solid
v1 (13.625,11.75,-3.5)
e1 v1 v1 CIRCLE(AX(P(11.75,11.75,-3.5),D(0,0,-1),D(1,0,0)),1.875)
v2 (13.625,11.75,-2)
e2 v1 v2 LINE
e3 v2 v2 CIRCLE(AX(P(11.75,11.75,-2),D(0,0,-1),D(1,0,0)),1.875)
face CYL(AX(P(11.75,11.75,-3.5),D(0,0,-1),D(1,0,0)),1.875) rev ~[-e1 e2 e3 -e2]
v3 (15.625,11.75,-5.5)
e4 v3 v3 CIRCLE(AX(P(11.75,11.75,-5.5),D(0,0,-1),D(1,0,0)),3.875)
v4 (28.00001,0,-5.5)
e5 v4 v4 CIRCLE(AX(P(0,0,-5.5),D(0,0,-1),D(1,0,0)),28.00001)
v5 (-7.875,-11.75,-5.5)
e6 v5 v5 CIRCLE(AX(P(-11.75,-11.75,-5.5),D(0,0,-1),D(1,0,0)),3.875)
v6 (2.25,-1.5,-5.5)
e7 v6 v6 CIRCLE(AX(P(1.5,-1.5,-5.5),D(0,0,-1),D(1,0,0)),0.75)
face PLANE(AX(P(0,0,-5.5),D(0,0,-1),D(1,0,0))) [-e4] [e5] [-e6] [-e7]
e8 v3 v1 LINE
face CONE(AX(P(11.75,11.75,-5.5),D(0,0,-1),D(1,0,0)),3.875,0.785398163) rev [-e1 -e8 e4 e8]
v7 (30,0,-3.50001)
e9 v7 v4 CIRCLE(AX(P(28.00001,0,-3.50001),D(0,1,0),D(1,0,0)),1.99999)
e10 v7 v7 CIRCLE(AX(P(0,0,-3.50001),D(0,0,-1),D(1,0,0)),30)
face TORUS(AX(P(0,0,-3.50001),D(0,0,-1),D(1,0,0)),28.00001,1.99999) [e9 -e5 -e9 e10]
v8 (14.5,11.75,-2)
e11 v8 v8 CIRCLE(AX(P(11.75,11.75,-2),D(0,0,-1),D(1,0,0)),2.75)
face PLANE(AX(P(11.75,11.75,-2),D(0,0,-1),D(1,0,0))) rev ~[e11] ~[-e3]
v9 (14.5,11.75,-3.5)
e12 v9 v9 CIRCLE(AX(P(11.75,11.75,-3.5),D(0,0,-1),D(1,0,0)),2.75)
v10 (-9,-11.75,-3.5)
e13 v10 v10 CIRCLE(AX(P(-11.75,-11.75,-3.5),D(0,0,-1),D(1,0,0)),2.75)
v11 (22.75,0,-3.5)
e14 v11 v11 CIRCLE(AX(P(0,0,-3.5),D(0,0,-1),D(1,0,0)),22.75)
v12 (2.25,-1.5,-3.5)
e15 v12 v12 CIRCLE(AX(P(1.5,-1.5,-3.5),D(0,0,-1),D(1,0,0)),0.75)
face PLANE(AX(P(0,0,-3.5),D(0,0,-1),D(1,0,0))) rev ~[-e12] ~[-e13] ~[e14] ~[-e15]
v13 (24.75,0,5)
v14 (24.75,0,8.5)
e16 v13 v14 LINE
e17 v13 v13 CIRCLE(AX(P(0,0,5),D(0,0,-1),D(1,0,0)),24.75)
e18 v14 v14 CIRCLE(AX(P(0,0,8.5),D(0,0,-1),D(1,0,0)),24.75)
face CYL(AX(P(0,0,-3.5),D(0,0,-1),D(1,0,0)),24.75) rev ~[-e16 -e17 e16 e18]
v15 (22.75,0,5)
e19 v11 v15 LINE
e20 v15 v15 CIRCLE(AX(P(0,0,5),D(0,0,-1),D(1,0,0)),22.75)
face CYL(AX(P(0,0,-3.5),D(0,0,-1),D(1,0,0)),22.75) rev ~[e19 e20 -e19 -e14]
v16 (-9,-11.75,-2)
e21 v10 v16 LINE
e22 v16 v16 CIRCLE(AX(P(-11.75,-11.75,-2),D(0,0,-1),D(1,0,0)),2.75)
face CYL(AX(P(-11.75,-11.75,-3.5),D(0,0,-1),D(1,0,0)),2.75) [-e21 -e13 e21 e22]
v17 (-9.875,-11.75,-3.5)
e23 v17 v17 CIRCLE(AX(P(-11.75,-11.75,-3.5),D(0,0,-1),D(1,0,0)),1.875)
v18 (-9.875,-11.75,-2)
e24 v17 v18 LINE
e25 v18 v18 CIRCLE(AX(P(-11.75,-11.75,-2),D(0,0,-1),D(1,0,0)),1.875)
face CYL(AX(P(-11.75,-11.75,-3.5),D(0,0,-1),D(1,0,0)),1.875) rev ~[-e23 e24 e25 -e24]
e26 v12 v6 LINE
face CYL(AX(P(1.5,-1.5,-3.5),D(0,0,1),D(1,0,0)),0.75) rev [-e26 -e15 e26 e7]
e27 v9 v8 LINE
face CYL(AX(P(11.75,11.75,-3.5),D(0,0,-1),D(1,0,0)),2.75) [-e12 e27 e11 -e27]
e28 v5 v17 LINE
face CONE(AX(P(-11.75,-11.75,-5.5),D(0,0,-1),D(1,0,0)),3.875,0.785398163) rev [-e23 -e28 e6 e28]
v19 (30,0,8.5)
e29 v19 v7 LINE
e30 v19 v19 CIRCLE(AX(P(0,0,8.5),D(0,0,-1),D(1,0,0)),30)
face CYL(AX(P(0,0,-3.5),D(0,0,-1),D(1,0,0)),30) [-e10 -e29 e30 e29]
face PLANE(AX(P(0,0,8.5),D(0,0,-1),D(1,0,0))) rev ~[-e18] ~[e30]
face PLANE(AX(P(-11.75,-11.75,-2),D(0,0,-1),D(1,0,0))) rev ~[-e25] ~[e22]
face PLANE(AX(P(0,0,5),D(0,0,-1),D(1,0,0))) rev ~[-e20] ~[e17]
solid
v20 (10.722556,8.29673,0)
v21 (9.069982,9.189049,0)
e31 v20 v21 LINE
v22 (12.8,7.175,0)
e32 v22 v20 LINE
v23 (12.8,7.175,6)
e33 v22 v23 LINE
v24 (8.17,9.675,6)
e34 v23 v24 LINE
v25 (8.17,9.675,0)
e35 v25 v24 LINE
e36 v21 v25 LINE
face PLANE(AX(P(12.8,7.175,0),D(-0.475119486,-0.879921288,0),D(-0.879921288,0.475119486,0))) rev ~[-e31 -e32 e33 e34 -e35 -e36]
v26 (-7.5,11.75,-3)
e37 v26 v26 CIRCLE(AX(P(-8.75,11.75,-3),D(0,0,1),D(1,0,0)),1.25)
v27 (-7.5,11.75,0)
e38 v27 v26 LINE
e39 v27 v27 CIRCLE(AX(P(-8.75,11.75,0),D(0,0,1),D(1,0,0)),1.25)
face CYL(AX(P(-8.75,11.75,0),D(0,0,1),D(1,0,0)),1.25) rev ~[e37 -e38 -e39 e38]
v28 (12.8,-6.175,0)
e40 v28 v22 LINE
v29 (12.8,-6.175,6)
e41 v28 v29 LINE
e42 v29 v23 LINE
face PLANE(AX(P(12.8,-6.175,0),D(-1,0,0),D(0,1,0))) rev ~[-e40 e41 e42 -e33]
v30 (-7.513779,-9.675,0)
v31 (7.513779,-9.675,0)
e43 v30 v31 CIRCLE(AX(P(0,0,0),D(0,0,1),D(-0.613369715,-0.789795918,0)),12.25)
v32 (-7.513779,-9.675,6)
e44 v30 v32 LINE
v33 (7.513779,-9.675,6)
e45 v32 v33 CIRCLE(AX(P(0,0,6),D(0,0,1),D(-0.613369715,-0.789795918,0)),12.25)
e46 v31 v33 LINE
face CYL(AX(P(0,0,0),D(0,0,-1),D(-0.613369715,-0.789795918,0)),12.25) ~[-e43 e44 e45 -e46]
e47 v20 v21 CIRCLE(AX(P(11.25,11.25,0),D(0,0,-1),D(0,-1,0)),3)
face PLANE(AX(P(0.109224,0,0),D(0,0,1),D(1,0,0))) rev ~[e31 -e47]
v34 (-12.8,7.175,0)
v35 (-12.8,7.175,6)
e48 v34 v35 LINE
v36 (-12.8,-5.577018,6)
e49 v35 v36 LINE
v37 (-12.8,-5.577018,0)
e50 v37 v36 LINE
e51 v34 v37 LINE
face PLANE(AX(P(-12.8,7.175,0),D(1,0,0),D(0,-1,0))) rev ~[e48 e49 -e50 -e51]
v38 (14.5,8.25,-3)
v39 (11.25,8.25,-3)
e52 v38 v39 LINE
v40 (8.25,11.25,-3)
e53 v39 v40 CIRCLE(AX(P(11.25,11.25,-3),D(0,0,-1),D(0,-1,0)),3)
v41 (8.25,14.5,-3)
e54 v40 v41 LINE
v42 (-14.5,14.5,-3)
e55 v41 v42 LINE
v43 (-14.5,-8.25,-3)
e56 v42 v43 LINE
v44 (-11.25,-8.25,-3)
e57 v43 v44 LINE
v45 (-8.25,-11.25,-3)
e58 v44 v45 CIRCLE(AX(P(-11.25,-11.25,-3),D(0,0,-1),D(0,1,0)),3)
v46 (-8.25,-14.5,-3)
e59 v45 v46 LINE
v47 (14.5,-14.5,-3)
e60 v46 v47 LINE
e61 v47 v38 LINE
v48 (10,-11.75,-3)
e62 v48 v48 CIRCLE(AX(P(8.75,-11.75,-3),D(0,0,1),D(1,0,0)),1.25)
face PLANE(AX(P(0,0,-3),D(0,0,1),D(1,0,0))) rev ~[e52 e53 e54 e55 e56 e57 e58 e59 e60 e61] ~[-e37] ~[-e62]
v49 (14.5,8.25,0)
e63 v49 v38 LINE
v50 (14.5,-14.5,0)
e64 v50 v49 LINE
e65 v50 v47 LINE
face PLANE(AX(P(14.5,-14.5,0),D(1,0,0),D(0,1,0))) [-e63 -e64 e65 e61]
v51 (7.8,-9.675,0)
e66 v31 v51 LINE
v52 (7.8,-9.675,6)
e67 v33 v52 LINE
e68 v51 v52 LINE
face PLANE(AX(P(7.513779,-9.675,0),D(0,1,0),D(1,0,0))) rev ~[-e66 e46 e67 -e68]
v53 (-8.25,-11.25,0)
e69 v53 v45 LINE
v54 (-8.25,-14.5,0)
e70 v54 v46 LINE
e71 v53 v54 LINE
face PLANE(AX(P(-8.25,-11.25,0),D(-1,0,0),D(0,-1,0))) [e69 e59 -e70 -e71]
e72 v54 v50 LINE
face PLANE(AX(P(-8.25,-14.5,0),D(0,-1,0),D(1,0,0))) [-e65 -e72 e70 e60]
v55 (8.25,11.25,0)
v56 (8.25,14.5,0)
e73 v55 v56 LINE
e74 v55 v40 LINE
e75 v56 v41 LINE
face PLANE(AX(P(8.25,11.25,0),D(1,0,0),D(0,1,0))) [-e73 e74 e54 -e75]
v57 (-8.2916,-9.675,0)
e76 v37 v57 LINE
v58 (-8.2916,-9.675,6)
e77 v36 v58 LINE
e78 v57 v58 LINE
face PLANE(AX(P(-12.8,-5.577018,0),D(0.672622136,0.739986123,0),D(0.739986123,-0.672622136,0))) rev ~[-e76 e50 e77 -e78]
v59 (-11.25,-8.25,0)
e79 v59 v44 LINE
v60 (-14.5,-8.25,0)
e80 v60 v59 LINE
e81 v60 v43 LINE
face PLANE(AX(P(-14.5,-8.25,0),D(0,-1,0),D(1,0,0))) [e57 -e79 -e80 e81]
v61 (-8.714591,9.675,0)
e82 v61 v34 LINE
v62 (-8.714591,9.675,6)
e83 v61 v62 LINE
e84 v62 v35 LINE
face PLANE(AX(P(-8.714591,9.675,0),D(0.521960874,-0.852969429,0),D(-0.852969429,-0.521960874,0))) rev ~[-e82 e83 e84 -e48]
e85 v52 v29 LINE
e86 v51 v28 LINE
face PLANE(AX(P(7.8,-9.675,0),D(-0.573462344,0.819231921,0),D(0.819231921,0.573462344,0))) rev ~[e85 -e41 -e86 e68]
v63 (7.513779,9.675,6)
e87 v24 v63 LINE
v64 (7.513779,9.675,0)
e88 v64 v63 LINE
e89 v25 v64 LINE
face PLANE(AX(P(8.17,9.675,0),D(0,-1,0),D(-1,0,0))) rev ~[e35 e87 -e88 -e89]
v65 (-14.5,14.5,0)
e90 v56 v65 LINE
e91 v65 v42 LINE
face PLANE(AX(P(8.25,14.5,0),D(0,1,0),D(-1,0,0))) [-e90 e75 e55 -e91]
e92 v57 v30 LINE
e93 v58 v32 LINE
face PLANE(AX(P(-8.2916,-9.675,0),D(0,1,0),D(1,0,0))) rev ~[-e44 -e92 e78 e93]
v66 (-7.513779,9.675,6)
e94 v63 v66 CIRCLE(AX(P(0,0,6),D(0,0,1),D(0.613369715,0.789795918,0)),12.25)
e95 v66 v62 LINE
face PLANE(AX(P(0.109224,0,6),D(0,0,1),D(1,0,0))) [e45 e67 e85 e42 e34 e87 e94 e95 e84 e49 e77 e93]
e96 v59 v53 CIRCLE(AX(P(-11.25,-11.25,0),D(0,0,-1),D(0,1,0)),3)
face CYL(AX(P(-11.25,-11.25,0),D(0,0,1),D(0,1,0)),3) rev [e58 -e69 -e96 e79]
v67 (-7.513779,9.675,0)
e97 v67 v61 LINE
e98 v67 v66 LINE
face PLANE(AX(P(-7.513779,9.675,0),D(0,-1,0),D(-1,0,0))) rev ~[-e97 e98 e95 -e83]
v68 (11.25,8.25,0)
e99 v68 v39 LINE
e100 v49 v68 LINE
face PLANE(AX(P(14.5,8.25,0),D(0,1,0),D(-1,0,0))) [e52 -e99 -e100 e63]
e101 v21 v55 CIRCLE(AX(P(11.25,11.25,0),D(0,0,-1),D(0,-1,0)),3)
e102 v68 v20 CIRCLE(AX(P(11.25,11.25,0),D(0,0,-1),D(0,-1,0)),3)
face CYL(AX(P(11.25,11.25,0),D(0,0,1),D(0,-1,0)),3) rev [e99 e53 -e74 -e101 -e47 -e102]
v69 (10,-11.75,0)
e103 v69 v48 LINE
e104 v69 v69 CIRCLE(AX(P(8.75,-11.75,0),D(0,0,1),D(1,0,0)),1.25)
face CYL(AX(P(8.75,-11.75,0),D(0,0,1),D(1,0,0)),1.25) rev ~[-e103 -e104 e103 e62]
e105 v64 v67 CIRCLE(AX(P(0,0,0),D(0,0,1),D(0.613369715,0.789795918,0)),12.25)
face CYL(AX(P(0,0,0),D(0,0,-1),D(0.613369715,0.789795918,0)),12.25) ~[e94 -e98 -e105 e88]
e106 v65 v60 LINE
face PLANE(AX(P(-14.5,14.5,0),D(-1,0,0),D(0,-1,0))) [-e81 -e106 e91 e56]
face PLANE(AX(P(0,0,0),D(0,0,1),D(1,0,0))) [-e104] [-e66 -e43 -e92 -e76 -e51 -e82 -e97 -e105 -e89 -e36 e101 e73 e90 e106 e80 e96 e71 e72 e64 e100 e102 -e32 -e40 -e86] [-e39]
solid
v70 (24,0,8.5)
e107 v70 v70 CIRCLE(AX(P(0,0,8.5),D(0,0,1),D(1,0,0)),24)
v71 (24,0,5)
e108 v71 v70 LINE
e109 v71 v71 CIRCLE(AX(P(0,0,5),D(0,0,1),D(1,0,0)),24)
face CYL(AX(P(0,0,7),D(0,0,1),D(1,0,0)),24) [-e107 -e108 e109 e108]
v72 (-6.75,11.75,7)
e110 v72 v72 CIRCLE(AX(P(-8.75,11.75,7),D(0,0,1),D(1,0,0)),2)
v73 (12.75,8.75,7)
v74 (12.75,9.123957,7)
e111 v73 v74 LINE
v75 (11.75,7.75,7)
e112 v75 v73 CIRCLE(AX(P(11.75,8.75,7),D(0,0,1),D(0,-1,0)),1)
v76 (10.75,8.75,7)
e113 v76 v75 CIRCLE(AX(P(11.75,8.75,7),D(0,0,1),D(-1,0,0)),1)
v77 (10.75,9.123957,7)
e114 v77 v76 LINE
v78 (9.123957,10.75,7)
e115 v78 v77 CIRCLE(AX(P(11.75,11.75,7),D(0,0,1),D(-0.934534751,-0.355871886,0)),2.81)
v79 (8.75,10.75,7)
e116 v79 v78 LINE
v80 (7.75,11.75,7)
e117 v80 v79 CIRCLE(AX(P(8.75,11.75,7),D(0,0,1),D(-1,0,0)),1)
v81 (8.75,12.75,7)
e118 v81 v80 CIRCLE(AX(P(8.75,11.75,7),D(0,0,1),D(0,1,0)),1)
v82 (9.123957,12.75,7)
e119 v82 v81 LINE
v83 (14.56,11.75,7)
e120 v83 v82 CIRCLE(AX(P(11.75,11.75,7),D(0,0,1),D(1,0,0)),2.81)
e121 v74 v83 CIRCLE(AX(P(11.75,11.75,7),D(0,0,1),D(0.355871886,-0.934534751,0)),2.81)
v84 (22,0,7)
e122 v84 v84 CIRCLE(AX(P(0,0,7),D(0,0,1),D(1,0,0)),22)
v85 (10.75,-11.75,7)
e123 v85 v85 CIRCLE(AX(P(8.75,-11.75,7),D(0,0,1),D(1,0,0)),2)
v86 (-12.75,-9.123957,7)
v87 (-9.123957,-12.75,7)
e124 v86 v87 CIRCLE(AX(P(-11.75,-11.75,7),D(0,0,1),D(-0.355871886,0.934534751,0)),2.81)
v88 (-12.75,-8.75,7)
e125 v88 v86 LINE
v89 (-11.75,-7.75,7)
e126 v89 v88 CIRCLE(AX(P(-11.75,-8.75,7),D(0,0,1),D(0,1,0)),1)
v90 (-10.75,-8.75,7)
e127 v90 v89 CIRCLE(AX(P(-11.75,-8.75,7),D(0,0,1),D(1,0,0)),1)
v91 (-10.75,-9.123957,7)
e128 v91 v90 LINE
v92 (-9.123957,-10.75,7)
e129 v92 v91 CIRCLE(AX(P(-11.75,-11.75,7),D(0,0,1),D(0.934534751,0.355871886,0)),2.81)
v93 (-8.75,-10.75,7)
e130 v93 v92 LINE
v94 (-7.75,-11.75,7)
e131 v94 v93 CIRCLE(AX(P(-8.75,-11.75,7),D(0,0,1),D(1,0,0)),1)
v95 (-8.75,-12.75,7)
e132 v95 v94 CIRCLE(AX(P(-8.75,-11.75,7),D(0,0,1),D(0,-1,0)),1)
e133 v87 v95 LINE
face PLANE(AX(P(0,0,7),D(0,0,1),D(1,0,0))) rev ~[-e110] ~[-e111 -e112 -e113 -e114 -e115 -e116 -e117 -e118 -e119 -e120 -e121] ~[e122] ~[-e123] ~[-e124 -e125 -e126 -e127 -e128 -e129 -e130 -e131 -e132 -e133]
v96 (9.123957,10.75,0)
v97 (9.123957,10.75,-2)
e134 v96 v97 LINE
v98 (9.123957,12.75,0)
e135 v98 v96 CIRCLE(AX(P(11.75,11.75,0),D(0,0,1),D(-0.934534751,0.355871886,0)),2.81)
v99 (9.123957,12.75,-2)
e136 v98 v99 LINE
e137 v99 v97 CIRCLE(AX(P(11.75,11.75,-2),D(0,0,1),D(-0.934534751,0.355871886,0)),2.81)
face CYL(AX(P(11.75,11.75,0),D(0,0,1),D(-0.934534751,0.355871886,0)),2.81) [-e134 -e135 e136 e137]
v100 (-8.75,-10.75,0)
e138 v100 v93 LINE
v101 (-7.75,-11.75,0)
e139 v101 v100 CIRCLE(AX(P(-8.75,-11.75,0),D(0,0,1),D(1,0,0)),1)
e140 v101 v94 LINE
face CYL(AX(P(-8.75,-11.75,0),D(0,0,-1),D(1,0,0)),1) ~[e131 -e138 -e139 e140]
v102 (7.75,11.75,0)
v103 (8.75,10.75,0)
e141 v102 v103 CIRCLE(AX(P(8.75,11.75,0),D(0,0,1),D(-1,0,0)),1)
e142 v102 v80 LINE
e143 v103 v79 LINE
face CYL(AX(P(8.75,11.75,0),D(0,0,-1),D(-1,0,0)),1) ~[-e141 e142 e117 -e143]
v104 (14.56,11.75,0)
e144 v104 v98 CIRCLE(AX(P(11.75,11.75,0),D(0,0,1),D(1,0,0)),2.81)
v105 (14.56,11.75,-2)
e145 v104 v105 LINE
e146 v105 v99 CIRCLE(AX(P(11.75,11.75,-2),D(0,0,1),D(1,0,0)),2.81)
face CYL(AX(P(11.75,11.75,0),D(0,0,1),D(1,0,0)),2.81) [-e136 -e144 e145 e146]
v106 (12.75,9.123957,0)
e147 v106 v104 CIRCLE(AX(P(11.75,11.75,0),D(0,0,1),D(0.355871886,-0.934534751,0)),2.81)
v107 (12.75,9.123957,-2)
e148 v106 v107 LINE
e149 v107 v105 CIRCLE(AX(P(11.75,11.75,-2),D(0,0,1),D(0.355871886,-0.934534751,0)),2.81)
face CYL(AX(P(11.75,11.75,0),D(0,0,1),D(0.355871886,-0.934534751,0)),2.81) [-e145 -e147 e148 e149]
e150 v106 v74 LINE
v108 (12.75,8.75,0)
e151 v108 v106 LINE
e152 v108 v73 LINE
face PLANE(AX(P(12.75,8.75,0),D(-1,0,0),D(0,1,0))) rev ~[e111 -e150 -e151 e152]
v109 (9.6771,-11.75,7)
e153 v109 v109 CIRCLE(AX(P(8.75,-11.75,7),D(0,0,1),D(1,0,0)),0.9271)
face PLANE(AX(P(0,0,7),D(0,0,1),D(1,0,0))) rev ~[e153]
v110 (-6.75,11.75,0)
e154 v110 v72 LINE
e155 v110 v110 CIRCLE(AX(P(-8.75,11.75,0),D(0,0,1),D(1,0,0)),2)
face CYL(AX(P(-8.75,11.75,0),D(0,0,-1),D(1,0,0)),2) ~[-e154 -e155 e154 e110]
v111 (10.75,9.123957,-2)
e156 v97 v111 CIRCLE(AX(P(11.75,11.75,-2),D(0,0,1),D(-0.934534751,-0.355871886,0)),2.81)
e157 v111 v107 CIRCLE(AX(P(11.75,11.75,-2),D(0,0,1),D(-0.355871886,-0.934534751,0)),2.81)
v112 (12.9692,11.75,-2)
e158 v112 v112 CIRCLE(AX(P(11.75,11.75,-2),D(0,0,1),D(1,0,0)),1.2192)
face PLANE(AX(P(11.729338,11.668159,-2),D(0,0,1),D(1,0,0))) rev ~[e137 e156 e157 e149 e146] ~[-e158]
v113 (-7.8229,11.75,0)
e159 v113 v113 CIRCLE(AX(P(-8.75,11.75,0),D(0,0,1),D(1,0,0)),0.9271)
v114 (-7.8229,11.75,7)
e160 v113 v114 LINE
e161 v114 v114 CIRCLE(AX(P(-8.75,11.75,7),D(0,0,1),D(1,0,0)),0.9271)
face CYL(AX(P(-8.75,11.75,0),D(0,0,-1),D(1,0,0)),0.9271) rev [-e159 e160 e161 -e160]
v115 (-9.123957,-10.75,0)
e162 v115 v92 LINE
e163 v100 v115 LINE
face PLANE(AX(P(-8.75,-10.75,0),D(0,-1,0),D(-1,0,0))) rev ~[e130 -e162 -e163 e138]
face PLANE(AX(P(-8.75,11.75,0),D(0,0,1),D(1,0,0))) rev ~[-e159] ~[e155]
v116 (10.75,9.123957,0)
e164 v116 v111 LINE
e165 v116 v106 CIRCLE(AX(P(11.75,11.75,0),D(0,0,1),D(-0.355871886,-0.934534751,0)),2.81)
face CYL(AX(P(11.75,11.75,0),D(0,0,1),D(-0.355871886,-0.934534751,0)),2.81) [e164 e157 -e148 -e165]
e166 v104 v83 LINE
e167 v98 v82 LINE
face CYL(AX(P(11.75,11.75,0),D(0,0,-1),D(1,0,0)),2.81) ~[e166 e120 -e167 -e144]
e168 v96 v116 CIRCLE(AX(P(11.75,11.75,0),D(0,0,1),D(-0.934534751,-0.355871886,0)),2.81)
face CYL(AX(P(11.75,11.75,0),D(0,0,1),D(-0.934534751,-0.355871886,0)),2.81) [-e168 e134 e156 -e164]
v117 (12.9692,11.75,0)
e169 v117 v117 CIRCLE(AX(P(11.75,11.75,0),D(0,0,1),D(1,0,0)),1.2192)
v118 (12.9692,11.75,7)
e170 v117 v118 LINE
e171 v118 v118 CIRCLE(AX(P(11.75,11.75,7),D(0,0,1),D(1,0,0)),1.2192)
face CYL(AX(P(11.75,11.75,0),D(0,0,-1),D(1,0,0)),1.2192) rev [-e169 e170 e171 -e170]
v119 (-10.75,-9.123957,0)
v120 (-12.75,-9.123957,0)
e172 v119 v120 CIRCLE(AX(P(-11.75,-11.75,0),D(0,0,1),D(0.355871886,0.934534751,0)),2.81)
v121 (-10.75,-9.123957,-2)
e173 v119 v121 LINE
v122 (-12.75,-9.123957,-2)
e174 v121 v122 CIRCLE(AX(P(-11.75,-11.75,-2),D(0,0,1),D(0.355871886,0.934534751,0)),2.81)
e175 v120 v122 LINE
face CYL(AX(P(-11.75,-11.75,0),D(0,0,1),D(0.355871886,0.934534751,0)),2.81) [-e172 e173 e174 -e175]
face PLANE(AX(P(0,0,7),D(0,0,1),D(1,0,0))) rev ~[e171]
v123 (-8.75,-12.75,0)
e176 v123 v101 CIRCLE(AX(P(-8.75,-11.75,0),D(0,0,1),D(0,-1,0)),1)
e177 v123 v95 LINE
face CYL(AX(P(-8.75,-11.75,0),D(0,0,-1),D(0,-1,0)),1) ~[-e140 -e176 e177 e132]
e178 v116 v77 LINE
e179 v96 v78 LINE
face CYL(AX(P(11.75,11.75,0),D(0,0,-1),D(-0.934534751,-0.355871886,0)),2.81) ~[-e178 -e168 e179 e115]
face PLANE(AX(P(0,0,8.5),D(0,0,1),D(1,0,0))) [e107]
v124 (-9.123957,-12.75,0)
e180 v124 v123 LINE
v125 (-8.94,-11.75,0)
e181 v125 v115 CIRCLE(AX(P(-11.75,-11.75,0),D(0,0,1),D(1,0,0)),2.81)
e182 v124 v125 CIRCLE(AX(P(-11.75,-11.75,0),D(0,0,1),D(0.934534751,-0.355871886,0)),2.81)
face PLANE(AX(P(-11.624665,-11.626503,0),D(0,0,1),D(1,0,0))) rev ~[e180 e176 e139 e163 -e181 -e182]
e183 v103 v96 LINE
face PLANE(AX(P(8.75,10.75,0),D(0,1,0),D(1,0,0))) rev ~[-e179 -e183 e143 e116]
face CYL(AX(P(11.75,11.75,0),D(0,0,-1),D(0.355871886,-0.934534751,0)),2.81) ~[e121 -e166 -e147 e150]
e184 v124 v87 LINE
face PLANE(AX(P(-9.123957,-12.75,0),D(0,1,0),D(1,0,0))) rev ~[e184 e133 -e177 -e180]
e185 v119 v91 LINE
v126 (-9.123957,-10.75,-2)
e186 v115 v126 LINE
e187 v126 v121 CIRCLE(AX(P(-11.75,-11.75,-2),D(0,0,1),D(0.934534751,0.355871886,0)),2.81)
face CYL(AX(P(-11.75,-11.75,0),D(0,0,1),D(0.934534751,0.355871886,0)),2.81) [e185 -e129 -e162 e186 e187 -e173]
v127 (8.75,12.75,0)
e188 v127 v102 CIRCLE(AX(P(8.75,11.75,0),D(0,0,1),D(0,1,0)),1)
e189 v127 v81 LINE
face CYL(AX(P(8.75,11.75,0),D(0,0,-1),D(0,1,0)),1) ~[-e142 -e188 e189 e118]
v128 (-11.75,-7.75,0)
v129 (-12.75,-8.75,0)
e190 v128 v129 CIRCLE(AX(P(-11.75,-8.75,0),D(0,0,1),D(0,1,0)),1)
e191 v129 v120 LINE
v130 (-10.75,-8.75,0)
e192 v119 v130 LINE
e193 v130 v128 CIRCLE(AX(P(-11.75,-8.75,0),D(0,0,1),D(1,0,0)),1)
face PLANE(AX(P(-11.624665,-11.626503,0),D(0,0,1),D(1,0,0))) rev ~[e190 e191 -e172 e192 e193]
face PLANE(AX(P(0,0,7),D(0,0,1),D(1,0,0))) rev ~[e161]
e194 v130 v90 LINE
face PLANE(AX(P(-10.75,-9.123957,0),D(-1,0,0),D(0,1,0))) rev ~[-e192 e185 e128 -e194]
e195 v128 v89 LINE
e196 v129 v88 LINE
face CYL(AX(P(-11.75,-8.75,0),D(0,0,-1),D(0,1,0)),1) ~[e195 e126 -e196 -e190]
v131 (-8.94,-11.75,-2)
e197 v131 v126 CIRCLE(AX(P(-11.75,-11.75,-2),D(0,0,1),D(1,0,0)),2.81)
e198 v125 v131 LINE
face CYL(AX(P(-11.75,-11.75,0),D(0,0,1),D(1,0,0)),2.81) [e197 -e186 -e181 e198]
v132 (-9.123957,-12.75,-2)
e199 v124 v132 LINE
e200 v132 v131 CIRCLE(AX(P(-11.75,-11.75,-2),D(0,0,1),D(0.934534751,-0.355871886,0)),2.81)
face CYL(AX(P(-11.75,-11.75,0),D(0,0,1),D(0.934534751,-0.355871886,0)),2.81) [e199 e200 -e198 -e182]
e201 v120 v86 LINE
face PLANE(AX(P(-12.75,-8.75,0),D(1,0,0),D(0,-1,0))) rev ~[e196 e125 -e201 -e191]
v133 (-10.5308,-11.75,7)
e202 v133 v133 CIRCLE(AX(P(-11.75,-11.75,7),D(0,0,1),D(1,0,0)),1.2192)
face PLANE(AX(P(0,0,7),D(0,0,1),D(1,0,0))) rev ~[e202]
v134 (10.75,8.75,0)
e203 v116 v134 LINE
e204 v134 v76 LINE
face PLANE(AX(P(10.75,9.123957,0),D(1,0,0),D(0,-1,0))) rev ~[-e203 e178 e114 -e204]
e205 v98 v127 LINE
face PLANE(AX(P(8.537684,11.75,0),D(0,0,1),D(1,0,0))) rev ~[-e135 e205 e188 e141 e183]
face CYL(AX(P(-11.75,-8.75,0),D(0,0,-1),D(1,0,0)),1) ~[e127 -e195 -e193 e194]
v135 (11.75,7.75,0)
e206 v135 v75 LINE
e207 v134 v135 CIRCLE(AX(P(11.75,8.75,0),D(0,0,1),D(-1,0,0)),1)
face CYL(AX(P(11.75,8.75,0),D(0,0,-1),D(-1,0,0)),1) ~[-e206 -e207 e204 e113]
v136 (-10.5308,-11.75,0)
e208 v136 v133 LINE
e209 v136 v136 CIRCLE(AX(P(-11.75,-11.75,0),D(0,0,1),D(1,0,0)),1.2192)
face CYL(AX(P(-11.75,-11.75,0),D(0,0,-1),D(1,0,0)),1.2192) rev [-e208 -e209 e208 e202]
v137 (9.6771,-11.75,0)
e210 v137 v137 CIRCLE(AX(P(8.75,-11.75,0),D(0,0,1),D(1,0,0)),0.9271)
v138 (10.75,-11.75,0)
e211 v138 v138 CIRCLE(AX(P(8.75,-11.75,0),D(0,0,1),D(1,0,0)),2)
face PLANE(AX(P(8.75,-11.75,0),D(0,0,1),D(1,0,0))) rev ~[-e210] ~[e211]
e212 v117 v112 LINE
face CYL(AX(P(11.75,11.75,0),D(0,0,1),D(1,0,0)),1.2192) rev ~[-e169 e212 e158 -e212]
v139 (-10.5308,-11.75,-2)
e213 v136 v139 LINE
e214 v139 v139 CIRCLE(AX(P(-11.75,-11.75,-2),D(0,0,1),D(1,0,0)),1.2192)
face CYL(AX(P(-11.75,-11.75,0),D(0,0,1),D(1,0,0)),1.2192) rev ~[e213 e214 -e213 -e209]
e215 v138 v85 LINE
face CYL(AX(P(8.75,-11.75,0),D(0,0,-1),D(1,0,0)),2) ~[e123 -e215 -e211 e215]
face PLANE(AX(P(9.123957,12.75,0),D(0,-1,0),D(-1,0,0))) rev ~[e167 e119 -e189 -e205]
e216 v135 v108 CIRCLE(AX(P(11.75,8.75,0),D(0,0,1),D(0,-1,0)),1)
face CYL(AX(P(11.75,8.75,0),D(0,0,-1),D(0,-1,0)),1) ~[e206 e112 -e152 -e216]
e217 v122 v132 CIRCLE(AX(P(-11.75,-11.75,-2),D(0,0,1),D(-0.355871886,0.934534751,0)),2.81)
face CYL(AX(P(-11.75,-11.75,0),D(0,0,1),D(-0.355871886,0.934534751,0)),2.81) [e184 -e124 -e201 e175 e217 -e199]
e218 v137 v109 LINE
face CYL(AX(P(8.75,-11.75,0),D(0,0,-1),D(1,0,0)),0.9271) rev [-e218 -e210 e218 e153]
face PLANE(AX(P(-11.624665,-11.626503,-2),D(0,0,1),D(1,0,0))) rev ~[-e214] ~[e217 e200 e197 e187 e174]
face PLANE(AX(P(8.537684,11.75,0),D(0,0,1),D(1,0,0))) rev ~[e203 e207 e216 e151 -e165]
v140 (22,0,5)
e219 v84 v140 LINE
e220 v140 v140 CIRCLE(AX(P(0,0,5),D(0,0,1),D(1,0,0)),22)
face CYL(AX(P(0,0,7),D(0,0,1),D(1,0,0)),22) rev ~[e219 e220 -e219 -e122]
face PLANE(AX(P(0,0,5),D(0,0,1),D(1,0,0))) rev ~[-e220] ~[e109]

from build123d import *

# Parameters (mm, degrees)
F0_R      = 1.25
F1_DEPTH  = 3
F3_DEPTH  = 6
F4_R      = 1.2192
F5_DEPTH  = 7
F4_R_2    = 2
F4_R_3    = 0.9271
F7_R      = 24
F7_R_2    = 22
F7_R_3    = 21
F8_DEPTH  = 1.5
F9_DEPTH  = 2
F10_DEPTH = 2
F12_R     = 30
F12_R_2   = 24.75
F12_R_3   = 22.75
F12_R_4   = 2.75
F12_R_5   = 0.75
F12_R_6   = 1.875
F13_DEPTH = 2
F14_DEPTH = 1.5
F16_DEPTH = 8.5
F17_DEPTH = 12
F18_R     = 1.99999


# Not quite as in the source:
# - a fillet or chamfer that OpenCascade refuses, or shapes differently, is made with other operations: its cross-section is extruded or revolved along the edge and cut away or added
# - a fillet or chamfer is up to 0.001 mm smaller than in the source, because OpenCascade refuses the exact size


with BuildPart() as f1:
    # F0 (on Top) → F1 (new body)
    with BuildSketch(Plane.XY):
        with BuildLine():
            Line((8.25, 11.25), (8.25, 14.5))
            Line((8.25, 14.5), (-14.5, 14.5))
            Line((-14.5, 14.5), (-14.5, -8.25))
            Line((-14.5, -8.25), (-11.25, -8.25))
            ThreePointArc((-11.25, -8.25), (-9.1286796564, -9.1286796564), (-8.25, -11.25))
            Line((-8.25, -11.25), (-8.25, -14.5))
            Line((-8.25, -14.5), (14.5, -14.5))
            Line((14.5, -14.5), (14.5, 8.25))
            Line((14.5, 8.25), (11.25, 8.25))
            ThreePointArc((11.25, 8.25), (9.1286796564, 9.1286796564), (8.25, 11.25))
        make_face()
        with Locations((8.75, -11.75)):
            Circle(F0_R, mode=Mode.SUBTRACT)
        with Locations((-8.75, 11.75)):
            Circle(F0_R, mode=Mode.SUBTRACT)
    extrude(amount=-F1_DEPTH)

    # F2 (on Top) → F3 (join)
    with BuildSketch(Plane.XY):
        with BuildLine():
            ThreePointArc((7.5137790093, -9.675), (11.0024154817, -5.3860331941), (12.25, 0))
            ThreePointArc((12.25, 0), (11.0024154817, 5.3860331941), (7.5137790093, 9.675))
            Line((7.5137790093, 9.675), (-7.5137790093, 9.675))
            ThreePointArc((-7.5137790093, 9.675), (-12.25, 0), (-7.5137790093, -9.675))
            Line((-7.5137790093, -9.675), (7.5137790093, -9.675))
        make_face()
        with BuildLine():
            ThreePointArc((-7.5137790093, -9.675), (0, -12.25), (7.5137790093, -9.675))
            Line((7.5137790093, -9.675), (-7.5137790093, -9.675))
        make_face()
        with BuildLine():
            ThreePointArc((-7.5137790093, -9.675), (-12.25, 0), (-7.5137790093, 9.675))
            Line((-7.5137790093, 9.675), (-8.714591153, 9.675))
            Line((-8.714591153, 9.675), (-12.8, 7.175))
            Line((-12.8, 7.175), (-12.8, -5.5770184845))
            Line((-12.8, -5.5770184845), (-8.2916002721, -9.675))
            Line((-8.2916002721, -9.675), (-7.5137790093, -9.675))
        make_face()
        with BuildLine():
            ThreePointArc((7.5137790093, 9.675), (11.0024154817, 5.3860331941), (12.25, 0))
            ThreePointArc((12.25, 0), (11.0024154817, -5.3860331941), (7.5137790093, -9.675))
            Line((7.5137790093, -9.675), (7.8, -9.675))
            Line((7.8, -9.675), (12.8, -6.175))
            Line((12.8, -6.175), (12.8, 7.175))
            Line((12.8, 7.175), (8.17, 9.675))
            Line((8.17, 9.675), (7.5137790093, 9.675))
        make_face()
        with BuildLine():
            Line((-7.5137790093, 9.675), (7.5137790093, 9.675))
            ThreePointArc((7.5137790093, 9.675), (0, 12.25), (-7.5137790093, 9.675))
        make_face()
    extrude(amount=F3_DEPTH)


with BuildPart() as f5:
    # F4 (on Top) → F5 (new body)
    with BuildSketch(Plane.XY):
        with BuildLine():
            ThreePointArc((-9.1239573499, -12.75), (-8.9863719636, -12.2583896898), (-8.94, -11.75))
            ThreePointArc((-8.94, -11.75), (-8.9863719636, -11.2416103102), (-9.1239573499, -10.75))
            ThreePointArc((-9.1239573499, -10.75), (-9.7630299449, -9.7630299449), (-10.75, -9.1239573499))
            ThreePointArc((-10.75, -9.1239573499), (-11.75, -8.94), (-12.75, -9.1239573499))
            ThreePointArc((-12.75, -9.1239573499), (-13.7369700551, -13.7369700551), (-9.1239573499, -12.75))
        make_face()
        with Locations((-11.75, -11.75)):
            Circle(F4_R, mode=Mode.SUBTRACT)
        with BuildLine():
            ThreePointArc((-9.1239573499, -10.75), (-8.9863719636, -11.2416103102), (-8.94, -11.75))
            ThreePointArc((-8.94, -11.75), (-8.9863719636, -12.2583896898), (-9.1239573499, -12.75))
            Line((-9.1239573499, -12.75), (-8.75, -12.75))
            ThreePointArc((-8.75, -12.75), (-8.0428932188, -12.4571067812), (-7.75, -11.75))
            ThreePointArc((-7.75, -11.75), (-8.0428932188, -11.0428932188), (-8.75, -10.75))
            Line((-8.75, -10.75), (-9.1239573499, -10.75))
        make_face()
        with BuildLine():
            ThreePointArc((-12.75, -9.1239573499), (-11.75, -8.94), (-10.75, -9.1239573499))
            Line((-10.75, -9.1239573499), (-10.75, -8.75))
            ThreePointArc((-10.75, -8.75), (-11.0428932188, -8.0428932188), (-11.75, -7.75))
            ThreePointArc((-11.75, -7.75), (-12.4571067812, -8.0428932188), (-12.75, -8.75))
            Line((-12.75, -8.75), (-12.75, -9.1239573499))
        make_face()
    extrude(amount=F5_DEPTH)



with BuildPart() as f5b:
    # F4 (on Top) → F5, piece 2 (new body)
    with BuildSketch(Plane.XY):
        with Locations((8.75, -11.75)):
            Circle(F4_R_2)
        with Locations((8.75, -11.75)):
            Circle(F4_R_3, mode=Mode.SUBTRACT)
    extrude(amount=F5_DEPTH)


with BuildPart() as f5c:
    # F4 (on Top) → F5, piece 3 (new body)
    with BuildSketch(Plane.XY):
        with BuildLine():
            ThreePointArc((9.1239573499, 10.75), (8.94, 11.75), (9.1239573499, 12.75))
            Line((9.1239573499, 12.75), (8.75, 12.75))
            ThreePointArc((8.75, 12.75), (8.0428932188, 12.4571067812), (7.75, 11.75))
            ThreePointArc((7.75, 11.75), (8.0428932188, 11.0428932188), (8.75, 10.75))
            Line((8.75, 10.75), (9.1239573499, 10.75))
        make_face()
        with BuildLine():
            Line((12.75, 8.75), (12.75, 9.1239573499))
            ThreePointArc((12.75, 9.1239573499), (11.75, 8.94), (10.75, 9.1239573499))
            Line((10.75, 9.1239573499), (10.75, 8.75))
            ThreePointArc((10.75, 8.75), (11.0428932188, 8.0428932188), (11.75, 7.75))
            ThreePointArc((11.75, 7.75), (12.4571067812, 8.0428932188), (12.75, 8.75))
        make_face()
        with BuildLine():
            ThreePointArc((12.75, 9.1239573499), (14.0636659223, 10.1553056719), (14.56, 11.75))
            ThreePointArc((14.56, 11.75), (12.2583896898, 14.5136280364), (9.1239573499, 12.75))
            ThreePointArc((9.1239573499, 12.75), (8.94, 11.75), (9.1239573499, 10.75))
            ThreePointArc((9.1239573499, 10.75), (9.7630299449, 9.7630299449), (10.75, 9.1239573499))
            ThreePointArc((10.75, 9.1239573499), (11.75, 8.94), (12.75, 9.1239573499))
        make_face()
        with Locations((11.75, 11.75)):
            Circle(F4_R, mode=Mode.SUBTRACT)
    extrude(amount=F5_DEPTH)


with BuildPart() as f5d:
    # F4 (on Top) → F5, piece 4 (new body)
    with BuildSketch(Plane.XY):
        with Locations((-8.75, 11.75)):
            Circle(F4_R_2)
        with Locations((-8.75, 11.75)):
            Circle(F4_R_3, mode=Mode.SUBTRACT)
    extrude(amount=F5_DEPTH)


with BuildPart() as f5_1:
    add(f5.part)

    add(f5b.part)  # F8 merges F5b

    add(f5c.part)  # F8 merges F5c

    add(f5d.part)  # F8 merges F5d
    # F7 (on offset) → F8 (join)
    with BuildSketch(Plane.XY.offset(7)):
        Circle(F7_R)
        Circle(F7_R_2, mode=Mode.SUBTRACT)
        Circle(F7_R_2)
        Circle(F7_R_3, mode=Mode.SUBTRACT)
        Circle(F7_R_3)
    extrude(amount=F8_DEPTH)

    # F4 (on Top) → F9 (join)
    with BuildSketch(Plane.XY):
        with BuildLine():
            ThreePointArc((-9.1239573499, -12.75), (-8.9863719636, -12.2583896898), (-8.94, -11.75))
            ThreePointArc((-8.94, -11.75), (-8.9863719636, -11.2416103102), (-9.1239573499, -10.75))
            ThreePointArc((-9.1239573499, -10.75), (-9.7630299449, -9.7630299449), (-10.75, -9.1239573499))
            ThreePointArc((-10.75, -9.1239573499), (-11.75, -8.94), (-12.75, -9.1239573499))
            ThreePointArc((-12.75, -9.1239573499), (-13.7369700551, -13.7369700551), (-9.1239573499, -12.75))
        make_face()
        with Locations((-11.75, -11.75)):
            Circle(F4_R, mode=Mode.SUBTRACT)
        with BuildLine():
            ThreePointArc((12.75, 9.1239573499), (14.0636659223, 10.1553056719), (14.56, 11.75))
            ThreePointArc((14.56, 11.75), (12.2583896898, 14.5136280364), (9.1239573499, 12.75))
            ThreePointArc((9.1239573499, 12.75), (8.94, 11.75), (9.1239573499, 10.75))
            ThreePointArc((9.1239573499, 10.75), (9.7630299449, 9.7630299449), (10.75, 9.1239573499))
            ThreePointArc((10.75, 9.1239573499), (11.75, 8.94), (12.75, 9.1239573499))
        make_face()
        with Locations((11.75, 11.75)):
            Circle(F4_R, mode=Mode.SUBTRACT)
    extrude(amount=-F9_DEPTH)

    # F7 (on offset) → F10 (join)
    with BuildSketch(Plane.XY.offset(7)):
        Circle(F7_R)
        Circle(F7_R_2, mode=Mode.SUBTRACT)
    extrude(amount=-F10_DEPTH)


with BuildPart() as f13:
    # F12 (on offset) → F13 (new body)
    with BuildSketch(Plane(origin=(0, 0, -3.5), x_dir=(1, 0, 0), z_dir=(0, 0, -1))):
        Circle(F12_R)
        Circle(F12_R_2, mode=Mode.SUBTRACT)
        Circle(F12_R_2)
        Circle(F12_R_3, mode=Mode.SUBTRACT)
        Circle(F12_R_3)
        with Locations((11.75, -11.75)):
            Circle(F12_R_4, mode=Mode.SUBTRACT)
        with Locations((-11.75, 11.75)):
            Circle(F12_R_4, mode=Mode.SUBTRACT)
        with Locations((1.5, 1.5)):
            Circle(F12_R_5, mode=Mode.SUBTRACT)
        with Locations((-11.75, 11.75)):
            Circle(F12_R_4)
        with Locations((-11.75, 11.75)):
            Circle(F12_R_6, mode=Mode.SUBTRACT)
        with Locations((11.75, -11.75)):
            Circle(F12_R_4)
        with Locations((11.75, -11.75)):
            Circle(F12_R_6, mode=Mode.SUBTRACT)
    extrude(amount=F13_DEPTH)

    # F12 (on offset) → F14 (join)
    with BuildSketch(Plane(origin=(0, 0, -3.5), x_dir=(1, 0, 0), z_dir=(0, 0, -1))):
        with Locations((11.75, -11.75)):
            Circle(F12_R_4)
        with Locations((11.75, -11.75)):
            Circle(F12_R_6, mode=Mode.SUBTRACT)
        with Locations((-11.75, 11.75)):
            Circle(F12_R_4)
        with Locations((-11.75, 11.75)):
            Circle(F12_R_6, mode=Mode.SUBTRACT)
    extrude(amount=-F14_DEPTH)

    # F15: chamfer of 2 on 2 edges, made by hand

    # F15_s1 → F15_t2 (revolve, cut)
    with BuildSketch(Plane.XZ.offset(11.75)):
        Polygon((-7.875, -5.5), (-9.875, -3.5), (-9.875, -5.5), align=None)
    revolve(axis=Axis((-11.75, -11.75, -5.5), (0, 0, -1)), mode=Mode.SUBTRACT)

    # F15_s3 → F15_t4 (revolve, cut)
    with BuildSketch(Plane.XZ.offset(-11.75)):
        Polygon((15.625, -5.5), (13.625, -3.5), (13.625, -5.5), align=None)
    revolve(axis=Axis((11.75, 11.75, -5.5), (0, 0, -1)), mode=Mode.SUBTRACT)

    # F12 (on offset) → F16 (join, through all)
    with BuildSketch(Plane(origin=(0, 0, -3.5), x_dir=(1, 0, 0), z_dir=(0, 0, -1))):
        Circle(F12_R_2)
        Circle(F12_R_3, mode=Mode.SUBTRACT)
    extrude(amount=-F16_DEPTH)

    # F12 (on offset) → F17 (join)
    with BuildSketch(Plane(origin=(0, 0, -3.5), x_dir=(1, 0, 0), z_dir=(0, 0, -1))):
        Circle(F12_R)
        Circle(F12_R_2, mode=Mode.SUBTRACT)
    extrude(amount=-F17_DEPTH)

    # F18 (radius 2 in the source; OpenCascade refuses exactly that, so slightly less here)
    f18_edges = [f13.edges().sort_by_distance(p)[0] for p in [
        (-30, 0, -5.5),
    ]]
    fillet(f18_edges, radius=F18_R)


solid = Compound([f1.part, f5_1.part, f13.part])
